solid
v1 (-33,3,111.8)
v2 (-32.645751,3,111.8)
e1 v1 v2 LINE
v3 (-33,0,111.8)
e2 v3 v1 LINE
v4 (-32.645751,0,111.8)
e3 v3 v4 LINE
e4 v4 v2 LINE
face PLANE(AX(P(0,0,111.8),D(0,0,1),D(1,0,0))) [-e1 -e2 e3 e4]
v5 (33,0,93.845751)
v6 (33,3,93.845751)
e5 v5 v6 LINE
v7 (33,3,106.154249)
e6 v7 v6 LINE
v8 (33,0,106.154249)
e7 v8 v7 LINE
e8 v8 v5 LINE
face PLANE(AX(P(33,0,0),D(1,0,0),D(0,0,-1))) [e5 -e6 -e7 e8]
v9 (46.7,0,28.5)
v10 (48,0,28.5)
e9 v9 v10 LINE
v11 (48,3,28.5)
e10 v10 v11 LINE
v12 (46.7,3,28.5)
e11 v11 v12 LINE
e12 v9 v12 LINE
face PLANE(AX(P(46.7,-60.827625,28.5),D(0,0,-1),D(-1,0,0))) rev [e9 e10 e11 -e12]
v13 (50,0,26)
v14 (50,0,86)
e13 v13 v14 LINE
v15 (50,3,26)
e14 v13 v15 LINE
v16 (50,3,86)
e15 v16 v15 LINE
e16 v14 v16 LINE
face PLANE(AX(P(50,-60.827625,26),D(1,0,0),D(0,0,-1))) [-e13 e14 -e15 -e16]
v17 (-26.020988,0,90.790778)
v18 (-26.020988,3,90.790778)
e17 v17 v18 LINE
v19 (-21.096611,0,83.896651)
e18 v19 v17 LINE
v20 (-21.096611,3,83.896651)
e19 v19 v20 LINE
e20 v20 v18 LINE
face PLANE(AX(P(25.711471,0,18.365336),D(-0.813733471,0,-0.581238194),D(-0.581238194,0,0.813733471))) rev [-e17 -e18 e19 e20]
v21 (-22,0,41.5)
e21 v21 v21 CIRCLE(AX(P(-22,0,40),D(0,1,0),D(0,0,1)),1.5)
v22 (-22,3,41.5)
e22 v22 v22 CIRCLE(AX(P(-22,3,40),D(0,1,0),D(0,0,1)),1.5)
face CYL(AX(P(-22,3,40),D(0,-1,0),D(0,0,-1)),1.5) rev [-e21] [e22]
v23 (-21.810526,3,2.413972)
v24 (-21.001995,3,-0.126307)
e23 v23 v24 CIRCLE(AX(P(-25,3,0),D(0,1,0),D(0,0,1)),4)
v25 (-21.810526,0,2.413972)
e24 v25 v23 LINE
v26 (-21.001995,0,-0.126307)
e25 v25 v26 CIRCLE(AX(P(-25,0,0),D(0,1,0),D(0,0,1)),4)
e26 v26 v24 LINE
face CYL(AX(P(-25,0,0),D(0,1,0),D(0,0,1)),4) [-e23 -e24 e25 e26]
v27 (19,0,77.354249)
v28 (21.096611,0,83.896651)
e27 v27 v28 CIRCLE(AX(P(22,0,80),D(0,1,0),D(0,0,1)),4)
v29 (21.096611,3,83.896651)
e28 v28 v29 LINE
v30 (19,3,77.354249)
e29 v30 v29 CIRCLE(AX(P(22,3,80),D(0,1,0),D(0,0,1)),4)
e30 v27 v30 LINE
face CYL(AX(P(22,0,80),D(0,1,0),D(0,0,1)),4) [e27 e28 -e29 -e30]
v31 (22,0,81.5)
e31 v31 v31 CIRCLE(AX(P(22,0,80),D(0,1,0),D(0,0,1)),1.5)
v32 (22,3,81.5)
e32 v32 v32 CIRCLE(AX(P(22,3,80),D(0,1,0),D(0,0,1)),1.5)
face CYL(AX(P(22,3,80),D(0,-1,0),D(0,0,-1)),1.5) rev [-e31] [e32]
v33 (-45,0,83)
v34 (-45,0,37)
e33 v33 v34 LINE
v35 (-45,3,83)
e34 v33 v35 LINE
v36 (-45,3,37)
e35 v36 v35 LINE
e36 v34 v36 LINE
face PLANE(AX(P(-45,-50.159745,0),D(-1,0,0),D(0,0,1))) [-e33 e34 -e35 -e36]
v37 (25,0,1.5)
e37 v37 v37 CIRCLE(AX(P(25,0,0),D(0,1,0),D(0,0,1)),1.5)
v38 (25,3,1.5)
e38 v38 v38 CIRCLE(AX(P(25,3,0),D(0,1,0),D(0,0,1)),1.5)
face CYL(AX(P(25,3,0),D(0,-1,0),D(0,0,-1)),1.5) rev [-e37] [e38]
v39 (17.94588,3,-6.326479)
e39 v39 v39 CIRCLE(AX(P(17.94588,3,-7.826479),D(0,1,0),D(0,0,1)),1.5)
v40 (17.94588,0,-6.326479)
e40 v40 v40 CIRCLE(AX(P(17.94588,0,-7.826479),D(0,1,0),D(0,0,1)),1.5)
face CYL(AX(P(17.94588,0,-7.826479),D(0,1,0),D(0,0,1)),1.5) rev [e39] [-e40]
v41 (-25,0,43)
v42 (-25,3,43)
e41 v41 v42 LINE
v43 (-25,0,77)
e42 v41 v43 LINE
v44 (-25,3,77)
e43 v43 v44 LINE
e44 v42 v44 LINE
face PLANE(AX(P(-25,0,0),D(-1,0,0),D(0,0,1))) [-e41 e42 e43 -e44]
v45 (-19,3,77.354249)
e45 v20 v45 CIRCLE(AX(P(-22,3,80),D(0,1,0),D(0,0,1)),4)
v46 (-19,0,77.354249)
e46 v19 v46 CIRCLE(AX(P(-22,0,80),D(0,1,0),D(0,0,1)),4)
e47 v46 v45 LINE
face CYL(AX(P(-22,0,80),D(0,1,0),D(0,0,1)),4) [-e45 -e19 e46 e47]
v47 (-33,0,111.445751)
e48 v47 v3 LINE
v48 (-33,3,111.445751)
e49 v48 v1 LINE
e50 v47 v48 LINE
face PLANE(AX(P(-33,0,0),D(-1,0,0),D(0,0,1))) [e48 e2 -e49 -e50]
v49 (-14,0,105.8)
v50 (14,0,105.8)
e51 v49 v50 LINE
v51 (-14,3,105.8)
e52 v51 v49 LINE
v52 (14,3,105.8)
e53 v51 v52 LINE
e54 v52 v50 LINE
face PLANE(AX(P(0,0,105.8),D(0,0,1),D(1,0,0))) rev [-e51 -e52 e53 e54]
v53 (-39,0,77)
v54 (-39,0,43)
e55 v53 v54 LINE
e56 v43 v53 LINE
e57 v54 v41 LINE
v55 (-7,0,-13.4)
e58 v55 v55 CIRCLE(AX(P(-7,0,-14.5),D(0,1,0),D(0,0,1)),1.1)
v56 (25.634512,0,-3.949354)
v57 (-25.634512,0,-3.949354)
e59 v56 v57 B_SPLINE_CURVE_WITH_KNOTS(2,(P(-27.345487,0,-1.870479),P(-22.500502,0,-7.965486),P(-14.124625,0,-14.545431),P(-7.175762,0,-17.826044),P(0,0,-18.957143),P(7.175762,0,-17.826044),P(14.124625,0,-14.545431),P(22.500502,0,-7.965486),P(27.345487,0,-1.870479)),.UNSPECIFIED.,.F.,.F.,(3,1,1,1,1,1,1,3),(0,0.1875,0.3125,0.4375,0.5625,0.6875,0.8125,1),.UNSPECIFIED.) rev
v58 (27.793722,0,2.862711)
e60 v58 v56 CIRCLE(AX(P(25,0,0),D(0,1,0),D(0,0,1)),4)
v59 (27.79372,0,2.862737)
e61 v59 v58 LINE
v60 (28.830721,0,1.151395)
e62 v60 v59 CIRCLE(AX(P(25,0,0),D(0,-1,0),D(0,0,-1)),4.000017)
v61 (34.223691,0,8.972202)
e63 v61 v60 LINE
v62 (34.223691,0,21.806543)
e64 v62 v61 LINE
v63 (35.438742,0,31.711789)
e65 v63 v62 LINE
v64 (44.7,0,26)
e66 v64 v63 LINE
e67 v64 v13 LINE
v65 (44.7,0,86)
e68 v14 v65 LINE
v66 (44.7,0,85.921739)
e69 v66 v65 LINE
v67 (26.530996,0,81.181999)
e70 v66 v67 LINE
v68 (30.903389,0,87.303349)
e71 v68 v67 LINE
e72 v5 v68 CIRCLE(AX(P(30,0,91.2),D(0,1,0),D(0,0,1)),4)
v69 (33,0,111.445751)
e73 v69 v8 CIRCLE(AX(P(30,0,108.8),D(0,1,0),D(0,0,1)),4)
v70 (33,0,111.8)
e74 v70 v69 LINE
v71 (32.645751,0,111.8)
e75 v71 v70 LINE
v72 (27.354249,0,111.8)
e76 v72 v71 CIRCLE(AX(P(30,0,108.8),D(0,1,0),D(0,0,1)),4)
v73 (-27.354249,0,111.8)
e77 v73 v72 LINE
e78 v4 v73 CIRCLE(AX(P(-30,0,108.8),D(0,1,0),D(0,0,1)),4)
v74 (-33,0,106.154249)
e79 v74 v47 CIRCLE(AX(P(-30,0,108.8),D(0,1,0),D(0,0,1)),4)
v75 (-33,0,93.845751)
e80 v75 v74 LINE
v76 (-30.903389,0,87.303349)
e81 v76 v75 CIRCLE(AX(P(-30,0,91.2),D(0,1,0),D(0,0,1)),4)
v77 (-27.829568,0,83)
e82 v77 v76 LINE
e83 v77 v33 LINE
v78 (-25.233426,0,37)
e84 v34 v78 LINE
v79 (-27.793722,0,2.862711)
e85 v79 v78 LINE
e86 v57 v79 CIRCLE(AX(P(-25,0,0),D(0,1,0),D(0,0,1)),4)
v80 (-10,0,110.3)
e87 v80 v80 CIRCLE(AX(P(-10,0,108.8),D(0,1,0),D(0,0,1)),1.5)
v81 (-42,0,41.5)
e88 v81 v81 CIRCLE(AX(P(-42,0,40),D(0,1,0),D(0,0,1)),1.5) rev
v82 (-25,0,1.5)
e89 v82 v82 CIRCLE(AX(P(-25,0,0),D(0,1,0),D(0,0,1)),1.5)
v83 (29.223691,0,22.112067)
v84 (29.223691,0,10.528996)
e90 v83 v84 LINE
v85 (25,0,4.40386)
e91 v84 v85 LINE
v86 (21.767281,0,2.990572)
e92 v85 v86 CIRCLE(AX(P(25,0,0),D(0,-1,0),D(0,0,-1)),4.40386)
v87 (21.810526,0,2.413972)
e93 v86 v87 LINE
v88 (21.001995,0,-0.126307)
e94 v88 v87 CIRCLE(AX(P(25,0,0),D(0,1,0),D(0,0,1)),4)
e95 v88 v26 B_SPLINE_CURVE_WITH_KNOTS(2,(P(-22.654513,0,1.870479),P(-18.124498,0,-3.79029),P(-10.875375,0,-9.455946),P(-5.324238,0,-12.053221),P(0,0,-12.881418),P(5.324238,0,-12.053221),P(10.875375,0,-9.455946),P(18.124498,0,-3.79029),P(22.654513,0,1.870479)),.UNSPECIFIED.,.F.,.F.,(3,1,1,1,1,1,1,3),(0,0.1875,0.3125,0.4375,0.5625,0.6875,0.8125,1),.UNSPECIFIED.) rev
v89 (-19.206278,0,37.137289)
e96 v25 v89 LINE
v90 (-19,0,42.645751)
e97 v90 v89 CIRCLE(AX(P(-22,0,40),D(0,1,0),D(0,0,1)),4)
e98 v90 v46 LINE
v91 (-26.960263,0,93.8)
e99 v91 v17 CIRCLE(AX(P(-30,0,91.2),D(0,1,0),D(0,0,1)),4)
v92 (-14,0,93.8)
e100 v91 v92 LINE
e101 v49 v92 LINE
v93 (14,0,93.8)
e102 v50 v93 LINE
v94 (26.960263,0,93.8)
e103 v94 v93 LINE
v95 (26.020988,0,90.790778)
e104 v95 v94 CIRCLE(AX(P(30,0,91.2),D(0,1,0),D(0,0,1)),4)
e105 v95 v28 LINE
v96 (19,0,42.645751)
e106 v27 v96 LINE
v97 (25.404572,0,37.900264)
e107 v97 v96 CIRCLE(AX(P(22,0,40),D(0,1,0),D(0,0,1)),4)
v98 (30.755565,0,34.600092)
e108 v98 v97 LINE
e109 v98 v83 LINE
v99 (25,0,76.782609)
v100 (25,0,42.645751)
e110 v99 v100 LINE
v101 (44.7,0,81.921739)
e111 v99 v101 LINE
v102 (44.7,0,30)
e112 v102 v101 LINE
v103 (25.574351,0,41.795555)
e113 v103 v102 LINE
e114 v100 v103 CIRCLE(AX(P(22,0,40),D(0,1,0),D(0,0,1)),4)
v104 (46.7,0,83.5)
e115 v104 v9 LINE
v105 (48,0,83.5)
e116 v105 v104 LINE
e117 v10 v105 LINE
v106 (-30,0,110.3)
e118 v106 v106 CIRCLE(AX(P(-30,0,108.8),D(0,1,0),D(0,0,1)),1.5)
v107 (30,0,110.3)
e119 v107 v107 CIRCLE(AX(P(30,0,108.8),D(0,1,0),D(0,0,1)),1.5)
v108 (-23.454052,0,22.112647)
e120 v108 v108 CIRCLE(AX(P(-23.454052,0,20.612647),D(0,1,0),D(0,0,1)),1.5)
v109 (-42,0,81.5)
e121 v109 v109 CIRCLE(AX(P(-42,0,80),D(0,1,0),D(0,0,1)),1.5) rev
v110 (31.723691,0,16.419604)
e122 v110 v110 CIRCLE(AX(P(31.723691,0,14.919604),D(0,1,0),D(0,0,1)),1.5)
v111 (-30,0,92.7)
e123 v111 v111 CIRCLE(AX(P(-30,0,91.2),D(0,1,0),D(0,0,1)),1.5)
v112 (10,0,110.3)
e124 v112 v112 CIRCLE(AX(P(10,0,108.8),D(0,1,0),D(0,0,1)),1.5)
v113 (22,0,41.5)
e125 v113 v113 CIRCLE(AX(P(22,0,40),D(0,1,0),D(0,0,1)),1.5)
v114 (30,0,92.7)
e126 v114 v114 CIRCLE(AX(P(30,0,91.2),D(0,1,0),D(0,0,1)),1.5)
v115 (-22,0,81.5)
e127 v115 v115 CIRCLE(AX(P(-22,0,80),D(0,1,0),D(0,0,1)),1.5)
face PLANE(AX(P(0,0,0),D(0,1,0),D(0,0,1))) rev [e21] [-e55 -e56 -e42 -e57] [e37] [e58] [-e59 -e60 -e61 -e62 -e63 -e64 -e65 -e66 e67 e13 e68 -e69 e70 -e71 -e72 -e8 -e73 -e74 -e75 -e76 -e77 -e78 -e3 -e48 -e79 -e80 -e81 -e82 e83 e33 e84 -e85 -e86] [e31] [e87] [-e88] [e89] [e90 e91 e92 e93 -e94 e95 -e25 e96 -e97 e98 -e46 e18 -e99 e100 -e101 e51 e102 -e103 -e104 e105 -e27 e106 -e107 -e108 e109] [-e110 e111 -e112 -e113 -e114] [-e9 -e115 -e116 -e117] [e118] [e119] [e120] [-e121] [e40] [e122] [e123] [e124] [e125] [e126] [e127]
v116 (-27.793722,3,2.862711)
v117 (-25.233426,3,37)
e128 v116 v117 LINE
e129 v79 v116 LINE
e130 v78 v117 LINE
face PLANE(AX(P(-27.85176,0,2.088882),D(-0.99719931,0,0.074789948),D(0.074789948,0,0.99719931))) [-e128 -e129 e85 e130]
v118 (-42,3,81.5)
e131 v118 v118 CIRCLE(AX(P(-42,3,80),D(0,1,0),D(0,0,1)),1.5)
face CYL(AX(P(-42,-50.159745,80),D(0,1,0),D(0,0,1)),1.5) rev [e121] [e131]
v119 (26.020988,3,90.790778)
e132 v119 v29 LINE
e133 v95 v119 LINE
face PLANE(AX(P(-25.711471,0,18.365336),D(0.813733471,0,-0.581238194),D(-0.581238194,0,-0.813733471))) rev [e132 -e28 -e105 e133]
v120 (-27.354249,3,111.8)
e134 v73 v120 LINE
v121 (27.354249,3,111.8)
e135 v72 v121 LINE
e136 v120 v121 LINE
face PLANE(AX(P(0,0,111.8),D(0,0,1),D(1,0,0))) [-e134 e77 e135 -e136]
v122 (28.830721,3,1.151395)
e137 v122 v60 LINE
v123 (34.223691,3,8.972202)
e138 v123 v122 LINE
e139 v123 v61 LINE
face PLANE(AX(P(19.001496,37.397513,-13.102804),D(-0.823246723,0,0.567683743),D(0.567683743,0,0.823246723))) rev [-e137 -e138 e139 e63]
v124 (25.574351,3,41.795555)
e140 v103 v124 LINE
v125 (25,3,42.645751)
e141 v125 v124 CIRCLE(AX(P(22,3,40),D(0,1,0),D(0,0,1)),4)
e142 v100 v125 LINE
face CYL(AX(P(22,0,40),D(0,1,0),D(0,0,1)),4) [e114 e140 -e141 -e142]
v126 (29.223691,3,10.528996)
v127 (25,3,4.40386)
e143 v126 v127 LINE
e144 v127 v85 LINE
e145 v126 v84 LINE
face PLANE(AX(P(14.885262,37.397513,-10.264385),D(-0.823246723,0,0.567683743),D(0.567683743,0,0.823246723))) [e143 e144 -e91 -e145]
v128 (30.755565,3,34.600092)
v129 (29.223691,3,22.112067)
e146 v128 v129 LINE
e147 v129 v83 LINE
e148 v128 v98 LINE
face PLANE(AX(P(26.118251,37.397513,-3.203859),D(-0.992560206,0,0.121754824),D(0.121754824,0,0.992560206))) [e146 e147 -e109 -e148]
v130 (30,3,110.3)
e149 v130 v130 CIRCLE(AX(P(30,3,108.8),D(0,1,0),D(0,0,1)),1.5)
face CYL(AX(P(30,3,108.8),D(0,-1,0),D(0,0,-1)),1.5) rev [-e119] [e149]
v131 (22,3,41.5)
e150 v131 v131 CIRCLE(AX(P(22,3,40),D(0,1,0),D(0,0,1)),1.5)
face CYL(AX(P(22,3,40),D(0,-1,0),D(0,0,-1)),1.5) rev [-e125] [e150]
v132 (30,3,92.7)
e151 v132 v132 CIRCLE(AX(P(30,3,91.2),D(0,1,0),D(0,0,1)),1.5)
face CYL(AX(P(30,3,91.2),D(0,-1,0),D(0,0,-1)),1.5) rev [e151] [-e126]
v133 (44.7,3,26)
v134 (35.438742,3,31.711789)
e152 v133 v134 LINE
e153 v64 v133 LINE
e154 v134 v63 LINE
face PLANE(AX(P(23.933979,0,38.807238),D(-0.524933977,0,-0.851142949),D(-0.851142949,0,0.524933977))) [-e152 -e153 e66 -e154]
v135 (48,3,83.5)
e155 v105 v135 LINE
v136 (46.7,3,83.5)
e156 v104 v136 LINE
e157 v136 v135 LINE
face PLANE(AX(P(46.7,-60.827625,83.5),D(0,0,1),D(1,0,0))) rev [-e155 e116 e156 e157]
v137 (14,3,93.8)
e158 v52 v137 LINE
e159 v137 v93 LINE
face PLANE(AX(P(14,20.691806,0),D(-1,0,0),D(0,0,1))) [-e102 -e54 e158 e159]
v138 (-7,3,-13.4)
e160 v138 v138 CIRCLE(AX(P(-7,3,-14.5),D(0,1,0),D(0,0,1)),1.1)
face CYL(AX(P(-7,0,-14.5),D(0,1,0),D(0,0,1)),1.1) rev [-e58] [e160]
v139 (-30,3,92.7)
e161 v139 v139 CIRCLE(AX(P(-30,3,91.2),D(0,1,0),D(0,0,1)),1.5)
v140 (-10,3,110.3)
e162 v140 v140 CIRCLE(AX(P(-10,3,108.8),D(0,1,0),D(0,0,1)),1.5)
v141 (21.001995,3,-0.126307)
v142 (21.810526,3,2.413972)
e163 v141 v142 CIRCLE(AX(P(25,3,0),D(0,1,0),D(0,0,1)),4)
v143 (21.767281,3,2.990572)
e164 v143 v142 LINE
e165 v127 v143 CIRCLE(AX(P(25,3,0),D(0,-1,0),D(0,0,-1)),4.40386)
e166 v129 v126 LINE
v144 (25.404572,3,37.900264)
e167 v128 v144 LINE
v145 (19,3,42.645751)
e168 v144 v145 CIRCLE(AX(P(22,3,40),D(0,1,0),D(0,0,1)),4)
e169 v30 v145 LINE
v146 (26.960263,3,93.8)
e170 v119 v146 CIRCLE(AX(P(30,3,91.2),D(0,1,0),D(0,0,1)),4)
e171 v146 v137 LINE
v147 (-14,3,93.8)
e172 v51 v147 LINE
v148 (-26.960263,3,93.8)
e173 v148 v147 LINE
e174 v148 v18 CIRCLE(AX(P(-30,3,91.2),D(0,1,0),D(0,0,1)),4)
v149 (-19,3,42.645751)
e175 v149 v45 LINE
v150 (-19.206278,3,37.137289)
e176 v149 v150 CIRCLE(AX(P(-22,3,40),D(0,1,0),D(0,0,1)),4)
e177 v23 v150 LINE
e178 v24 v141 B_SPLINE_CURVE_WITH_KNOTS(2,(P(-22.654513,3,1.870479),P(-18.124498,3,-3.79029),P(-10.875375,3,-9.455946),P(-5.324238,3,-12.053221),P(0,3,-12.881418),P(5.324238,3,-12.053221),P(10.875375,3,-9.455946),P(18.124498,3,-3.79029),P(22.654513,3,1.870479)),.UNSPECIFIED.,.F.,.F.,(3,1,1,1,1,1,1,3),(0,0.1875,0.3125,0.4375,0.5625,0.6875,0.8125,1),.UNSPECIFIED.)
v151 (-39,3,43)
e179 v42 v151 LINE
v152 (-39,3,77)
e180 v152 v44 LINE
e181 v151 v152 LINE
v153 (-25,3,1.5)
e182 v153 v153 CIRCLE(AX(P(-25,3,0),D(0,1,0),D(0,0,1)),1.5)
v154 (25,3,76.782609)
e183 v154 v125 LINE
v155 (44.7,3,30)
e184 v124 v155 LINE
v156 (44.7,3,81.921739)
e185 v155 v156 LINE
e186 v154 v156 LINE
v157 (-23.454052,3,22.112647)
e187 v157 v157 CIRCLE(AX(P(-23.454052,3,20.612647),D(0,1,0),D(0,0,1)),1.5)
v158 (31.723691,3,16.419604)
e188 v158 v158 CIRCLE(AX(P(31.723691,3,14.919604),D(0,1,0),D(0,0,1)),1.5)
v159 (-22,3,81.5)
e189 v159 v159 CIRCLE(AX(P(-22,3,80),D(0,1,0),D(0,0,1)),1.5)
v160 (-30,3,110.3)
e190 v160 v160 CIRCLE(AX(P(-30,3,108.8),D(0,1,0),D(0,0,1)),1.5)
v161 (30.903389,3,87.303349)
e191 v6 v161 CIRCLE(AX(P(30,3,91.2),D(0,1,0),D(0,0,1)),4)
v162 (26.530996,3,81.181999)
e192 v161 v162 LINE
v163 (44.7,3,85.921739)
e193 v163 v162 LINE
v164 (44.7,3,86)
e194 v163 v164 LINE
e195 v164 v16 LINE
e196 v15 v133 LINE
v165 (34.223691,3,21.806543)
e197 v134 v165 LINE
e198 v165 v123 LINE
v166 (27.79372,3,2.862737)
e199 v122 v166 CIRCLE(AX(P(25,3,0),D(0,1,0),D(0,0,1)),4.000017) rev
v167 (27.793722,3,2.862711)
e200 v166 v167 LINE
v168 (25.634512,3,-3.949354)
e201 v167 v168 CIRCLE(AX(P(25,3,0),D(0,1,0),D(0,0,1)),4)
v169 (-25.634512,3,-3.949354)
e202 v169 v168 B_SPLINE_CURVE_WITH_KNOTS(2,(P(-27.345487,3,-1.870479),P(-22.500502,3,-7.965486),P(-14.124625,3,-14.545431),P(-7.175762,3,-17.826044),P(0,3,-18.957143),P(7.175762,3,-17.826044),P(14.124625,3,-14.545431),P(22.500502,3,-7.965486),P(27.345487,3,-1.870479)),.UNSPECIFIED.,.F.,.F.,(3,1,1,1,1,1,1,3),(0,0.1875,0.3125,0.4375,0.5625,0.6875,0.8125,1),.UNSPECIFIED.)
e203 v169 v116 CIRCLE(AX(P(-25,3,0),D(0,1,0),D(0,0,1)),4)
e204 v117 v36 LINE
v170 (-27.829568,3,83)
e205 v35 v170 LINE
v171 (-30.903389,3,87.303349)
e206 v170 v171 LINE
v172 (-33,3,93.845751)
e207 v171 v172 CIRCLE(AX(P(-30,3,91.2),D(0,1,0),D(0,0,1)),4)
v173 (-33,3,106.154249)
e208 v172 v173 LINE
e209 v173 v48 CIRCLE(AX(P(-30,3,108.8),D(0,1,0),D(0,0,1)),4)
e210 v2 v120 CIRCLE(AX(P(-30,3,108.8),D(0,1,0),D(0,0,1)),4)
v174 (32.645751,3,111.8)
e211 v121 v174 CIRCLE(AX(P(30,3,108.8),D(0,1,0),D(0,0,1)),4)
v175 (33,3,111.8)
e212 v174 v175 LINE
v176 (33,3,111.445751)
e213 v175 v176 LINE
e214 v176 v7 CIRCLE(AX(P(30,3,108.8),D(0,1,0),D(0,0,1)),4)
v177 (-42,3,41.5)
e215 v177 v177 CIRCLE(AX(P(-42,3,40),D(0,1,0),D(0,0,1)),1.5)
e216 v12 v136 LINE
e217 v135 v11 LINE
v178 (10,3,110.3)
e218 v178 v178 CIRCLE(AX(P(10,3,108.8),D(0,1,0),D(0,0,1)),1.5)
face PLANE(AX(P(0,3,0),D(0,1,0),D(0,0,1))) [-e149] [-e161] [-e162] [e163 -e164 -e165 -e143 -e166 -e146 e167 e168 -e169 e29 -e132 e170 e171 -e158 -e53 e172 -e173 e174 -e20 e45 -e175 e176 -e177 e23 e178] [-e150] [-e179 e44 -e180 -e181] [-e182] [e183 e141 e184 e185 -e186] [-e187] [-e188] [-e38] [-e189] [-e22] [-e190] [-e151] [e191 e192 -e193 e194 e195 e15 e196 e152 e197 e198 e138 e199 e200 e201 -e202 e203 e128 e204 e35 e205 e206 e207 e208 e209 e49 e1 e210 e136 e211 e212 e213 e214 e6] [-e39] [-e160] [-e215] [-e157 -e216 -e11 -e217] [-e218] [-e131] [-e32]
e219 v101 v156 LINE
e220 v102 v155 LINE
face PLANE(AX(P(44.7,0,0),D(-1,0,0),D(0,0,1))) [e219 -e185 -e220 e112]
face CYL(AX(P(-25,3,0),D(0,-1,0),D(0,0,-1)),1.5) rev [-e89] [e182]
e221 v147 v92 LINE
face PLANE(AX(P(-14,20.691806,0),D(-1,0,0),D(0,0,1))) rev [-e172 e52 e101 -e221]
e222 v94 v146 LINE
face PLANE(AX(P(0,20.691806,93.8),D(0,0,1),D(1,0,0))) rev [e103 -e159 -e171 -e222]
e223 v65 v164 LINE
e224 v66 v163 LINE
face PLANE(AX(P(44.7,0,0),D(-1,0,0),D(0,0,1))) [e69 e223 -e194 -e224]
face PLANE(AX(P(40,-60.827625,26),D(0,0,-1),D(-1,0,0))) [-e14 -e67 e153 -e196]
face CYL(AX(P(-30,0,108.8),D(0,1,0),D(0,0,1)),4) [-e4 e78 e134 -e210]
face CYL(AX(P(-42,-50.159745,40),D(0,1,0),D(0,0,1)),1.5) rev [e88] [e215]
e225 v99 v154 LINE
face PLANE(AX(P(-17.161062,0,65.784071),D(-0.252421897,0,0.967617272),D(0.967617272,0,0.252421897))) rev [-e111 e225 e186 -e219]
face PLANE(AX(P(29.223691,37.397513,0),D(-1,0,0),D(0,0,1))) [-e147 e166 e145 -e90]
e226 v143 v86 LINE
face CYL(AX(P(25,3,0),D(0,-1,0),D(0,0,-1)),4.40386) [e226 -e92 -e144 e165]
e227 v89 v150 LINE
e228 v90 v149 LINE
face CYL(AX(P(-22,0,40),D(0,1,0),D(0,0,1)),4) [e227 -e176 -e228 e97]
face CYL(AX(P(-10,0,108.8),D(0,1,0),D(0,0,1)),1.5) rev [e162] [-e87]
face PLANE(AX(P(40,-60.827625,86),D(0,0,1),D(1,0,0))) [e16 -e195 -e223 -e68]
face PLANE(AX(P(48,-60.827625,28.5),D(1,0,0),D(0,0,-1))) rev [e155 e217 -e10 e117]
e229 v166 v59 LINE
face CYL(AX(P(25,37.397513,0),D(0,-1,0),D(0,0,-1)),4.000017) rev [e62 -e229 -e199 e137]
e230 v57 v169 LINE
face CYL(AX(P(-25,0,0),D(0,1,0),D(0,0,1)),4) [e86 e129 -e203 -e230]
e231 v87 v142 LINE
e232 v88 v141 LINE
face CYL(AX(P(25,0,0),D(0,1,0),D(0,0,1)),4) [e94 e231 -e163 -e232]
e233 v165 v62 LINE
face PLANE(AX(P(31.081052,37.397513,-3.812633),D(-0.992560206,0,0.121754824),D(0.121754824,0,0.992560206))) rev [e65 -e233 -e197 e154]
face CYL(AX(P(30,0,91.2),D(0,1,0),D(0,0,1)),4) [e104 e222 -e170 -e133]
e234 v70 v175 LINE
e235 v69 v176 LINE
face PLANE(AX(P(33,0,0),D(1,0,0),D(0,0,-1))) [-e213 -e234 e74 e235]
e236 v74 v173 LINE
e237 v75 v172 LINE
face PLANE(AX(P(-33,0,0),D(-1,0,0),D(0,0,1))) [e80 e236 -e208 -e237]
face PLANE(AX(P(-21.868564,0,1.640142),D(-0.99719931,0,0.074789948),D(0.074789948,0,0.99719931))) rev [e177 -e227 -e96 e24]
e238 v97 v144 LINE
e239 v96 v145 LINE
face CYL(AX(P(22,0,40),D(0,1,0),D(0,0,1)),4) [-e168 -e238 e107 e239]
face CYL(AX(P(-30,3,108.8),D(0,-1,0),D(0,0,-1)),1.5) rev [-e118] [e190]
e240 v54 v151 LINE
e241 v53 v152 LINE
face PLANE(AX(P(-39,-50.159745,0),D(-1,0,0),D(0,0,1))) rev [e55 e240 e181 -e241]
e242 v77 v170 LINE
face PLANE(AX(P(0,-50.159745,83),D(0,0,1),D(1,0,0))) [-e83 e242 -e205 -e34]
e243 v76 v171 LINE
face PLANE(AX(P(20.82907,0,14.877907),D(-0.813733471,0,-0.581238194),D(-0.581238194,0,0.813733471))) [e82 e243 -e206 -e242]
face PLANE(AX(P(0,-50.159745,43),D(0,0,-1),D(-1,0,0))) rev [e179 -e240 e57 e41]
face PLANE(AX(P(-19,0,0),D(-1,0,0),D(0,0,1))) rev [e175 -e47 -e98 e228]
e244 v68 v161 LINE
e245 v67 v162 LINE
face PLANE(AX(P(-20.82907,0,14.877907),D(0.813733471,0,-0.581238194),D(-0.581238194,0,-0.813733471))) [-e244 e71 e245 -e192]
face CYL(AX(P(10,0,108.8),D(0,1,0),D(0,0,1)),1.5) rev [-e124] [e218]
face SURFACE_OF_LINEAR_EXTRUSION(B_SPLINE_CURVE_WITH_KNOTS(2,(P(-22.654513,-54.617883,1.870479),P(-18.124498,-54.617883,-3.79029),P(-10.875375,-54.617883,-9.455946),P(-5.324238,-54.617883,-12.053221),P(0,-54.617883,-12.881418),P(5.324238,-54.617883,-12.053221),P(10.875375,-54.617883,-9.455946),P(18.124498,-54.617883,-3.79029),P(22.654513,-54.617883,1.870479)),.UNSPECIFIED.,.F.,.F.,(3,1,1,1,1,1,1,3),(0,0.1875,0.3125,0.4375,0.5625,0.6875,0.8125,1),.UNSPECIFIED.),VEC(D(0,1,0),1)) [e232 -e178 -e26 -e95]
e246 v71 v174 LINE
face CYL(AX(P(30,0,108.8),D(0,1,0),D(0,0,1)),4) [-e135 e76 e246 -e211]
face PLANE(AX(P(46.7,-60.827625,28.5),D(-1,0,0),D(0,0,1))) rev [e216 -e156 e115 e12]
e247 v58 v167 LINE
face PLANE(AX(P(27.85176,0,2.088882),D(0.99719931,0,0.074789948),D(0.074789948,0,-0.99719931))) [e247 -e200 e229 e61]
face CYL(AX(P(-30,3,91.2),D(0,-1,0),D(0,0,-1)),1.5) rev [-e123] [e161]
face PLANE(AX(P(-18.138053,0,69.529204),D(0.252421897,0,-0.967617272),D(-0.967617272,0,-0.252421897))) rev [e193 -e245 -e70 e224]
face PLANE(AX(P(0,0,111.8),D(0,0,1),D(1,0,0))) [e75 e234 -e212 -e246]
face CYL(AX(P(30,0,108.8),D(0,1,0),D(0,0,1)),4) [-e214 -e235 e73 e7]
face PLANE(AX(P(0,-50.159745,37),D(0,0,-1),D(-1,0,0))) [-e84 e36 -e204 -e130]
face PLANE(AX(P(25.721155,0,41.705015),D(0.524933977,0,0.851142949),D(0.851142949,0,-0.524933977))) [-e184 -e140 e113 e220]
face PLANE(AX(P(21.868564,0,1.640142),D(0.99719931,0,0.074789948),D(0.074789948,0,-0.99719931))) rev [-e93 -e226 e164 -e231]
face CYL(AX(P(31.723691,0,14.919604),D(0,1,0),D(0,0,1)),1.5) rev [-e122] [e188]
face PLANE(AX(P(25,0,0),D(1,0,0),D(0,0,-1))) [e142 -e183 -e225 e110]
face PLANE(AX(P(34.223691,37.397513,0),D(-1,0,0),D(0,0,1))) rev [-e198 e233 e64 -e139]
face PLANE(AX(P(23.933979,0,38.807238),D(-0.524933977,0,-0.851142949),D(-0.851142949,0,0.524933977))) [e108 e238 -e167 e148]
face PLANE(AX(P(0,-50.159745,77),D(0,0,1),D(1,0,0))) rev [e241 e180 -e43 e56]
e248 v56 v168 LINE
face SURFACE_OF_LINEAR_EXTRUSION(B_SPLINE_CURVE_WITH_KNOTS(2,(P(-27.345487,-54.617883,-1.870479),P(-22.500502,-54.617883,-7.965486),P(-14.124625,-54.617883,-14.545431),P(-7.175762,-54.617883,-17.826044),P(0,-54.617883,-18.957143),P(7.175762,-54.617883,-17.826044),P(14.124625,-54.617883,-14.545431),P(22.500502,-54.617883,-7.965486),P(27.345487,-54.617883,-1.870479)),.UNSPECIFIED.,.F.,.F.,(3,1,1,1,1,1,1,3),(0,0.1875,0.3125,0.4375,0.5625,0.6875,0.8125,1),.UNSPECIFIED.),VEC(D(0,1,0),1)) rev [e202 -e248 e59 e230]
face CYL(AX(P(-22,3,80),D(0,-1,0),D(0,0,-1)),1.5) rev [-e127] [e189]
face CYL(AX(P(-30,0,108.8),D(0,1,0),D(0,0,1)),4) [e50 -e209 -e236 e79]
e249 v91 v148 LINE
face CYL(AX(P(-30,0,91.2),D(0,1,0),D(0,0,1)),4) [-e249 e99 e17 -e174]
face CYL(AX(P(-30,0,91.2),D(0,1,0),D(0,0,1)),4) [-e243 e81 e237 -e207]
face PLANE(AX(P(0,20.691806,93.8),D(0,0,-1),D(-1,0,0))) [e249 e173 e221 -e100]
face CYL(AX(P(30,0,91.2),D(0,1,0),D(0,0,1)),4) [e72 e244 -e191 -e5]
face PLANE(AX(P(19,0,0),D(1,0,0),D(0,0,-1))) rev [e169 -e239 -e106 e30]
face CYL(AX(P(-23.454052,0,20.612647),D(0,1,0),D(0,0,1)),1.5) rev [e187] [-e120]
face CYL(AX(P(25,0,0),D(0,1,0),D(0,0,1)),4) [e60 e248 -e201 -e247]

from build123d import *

# Parameters (mm, degrees)
SKETCH_1_W           = 80
SKETCH_1_H           = 120
SKETCH_1_R           = 1.5
EXTRUDE_1_DEPTH      = 3
SKETCH_2_W           = 10
SKETCH_2_H           = 60
SKETCH_2_W_2         = 1.3
SKETCH_2_H_2         = 55
EXTRUDE_2_DEPTH      = 3
CUT_EXTRUDE_1_DEPTH  = 126.435242257
EXTRUDE_4_DEPTH      = 3
EXTRUDE_START        = -3
EXTRUDE_7_DEPTH      = 3
CUT_EXTRUDE_5_DEPTH  = 124.421392121
SKETCH_20_W          = 13
SKETCH_20_H          = 12
EXTRUDE_8_DEPTH      = 3
CUT_EXTRUDE_6_DEPTH  = 124.421392121
SKETCH_23_R          = 1.5
EXTRUDE_9_DEPTH      = 3
SKETCH_24_R          = 1.5
CUT_EXTRUDE_7_DEPTH  = 124.421392121
SKETCH_25_R          = 1.5
CUT_EXTRUDE_8_DEPTH  = 124.421392121
SKETCH_26_R          = 1.5
CUT_EXTRUDE_9_DEPTH  = 124.421392121
SKETCH_27_R          = 1.1
CUT_EXTRUDE_10_DEPTH = 124.421392121


# Read off the part's stored shape, not the designer's step: 凸台-拉伸7
with BuildPart() as part:
    # 草图1 → 凸台-拉伸1 (new body)
    with BuildSketch(Plane(origin=(0, 0, 0), x_dir=(1, 0, 0), z_dir=(0, 1, 0))):
        with Locations((0, -55)):
            Rectangle(SKETCH_1_W, SKETCH_1_H)
        with Locations(Location((-25, 0, 0), (0, 0, 270))):
            Circle(SKETCH_1_R, mode=Mode.SUBTRACT)
        with Locations(Location((25, 0, 0), (0, 0, 270))):
            Circle(SKETCH_1_R, mode=Mode.SUBTRACT)
        with Locations(Location((-30, -91.2, 0), (0, 0, 270))):
            Circle(SKETCH_1_R, mode=Mode.SUBTRACT)
        with Locations(Location((-30, -108.8, 0), (0, 0, 270))):
            Circle(SKETCH_1_R, mode=Mode.SUBTRACT)
        with Locations(Location((30, -108.8, 0), (0, 0, 270))):
            Circle(SKETCH_1_R, mode=Mode.SUBTRACT)
        with Locations(Location((30, -91.2, 0), (0, 0, 270))):
            Circle(SKETCH_1_R, mode=Mode.SUBTRACT)
        with Locations(Location((-22, -40, 0), (0, 0, 270))):
            Circle(SKETCH_1_R, mode=Mode.SUBTRACT)
        with Locations(Location((-22, -80, 0), (0, 0, 270))):
            Circle(SKETCH_1_R, mode=Mode.SUBTRACT)
        with Locations(Location((22, -40, 0), (0, 0, 270))):
            Circle(SKETCH_1_R, mode=Mode.SUBTRACT)
        with Locations(Location((22, -80, 0), (0, 0, 270))):
            Circle(SKETCH_1_R, mode=Mode.SUBTRACT)
    extrude(amount=EXTRUDE_1_DEPTH)

    # 草图2 → 凸台-拉伸2 (add)
    with BuildSketch(Plane(origin=(0, 3, 0), x_dir=(1, 0, 0), z_dir=(0, 1, 0))):
        with Locations((45, -56)):
            Rectangle(SKETCH_2_W, SKETCH_2_H)
        with Locations((47.35, -56)):
            Rectangle(SKETCH_2_W_2, SKETCH_2_H_2, mode=Mode.SUBTRACT)
    extrude(amount=-EXTRUDE_2_DEPTH)

    # 草图6 → 切除-拉伸1 (cut, through all)
    with BuildSketch(Plane(origin=(0, 3, 0), x_dir=(1, 0, 0), z_dir=(0, 1, 0))):
        with BuildLine():
            Line((-25.189473533, -37.586028463), (-27.793722326, -2.862711226))
            ThreePointArc((-27.793722326, -2.862711226), (-26.553240274, 3.686115117), (-21, 0))
            ThreePointArc((-21, 0), (-21.20804179, -1.27320577), (-21.810526467, -2.413971537))
            Line((-21.810526467, -2.413971537), (-19.206277674, -37.137288774))
            ThreePointArc((-19.206277674, -37.137288774), (-18.313884883, -38.446759726), (-18, -40))
            ThreePointArc((-18, -40), (-18.258342613, -41.414213562), (-19, -42.645751311))
            Line((-19, -42.645751311), (-19, -77.354248689))
            ThreePointArc((-19, -77.354248689), (-18.258342613, -78.585786438), (-18, -80))
            ThreePointArc((-18, -80), (-18.868422538, -82.488618613), (-21.096611299, -83.896650979))
            Line((-21.096611299, -83.896650979), (-26.020987873, -90.790778183))
            ThreePointArc((-26.020987873, -90.790778183), (-26.005250414, -90.995120165), (-26, -91.2))
            ThreePointArc((-26, -91.2), (-26.258342613, -92.614213562), (-27, -93.845751311))
            Line((-27, -93.845751311), (-27, -105.8))
            Line((-27, -105.8), (27, -105.8))
            Line((27, -105.8), (27, -93.845751311))
            ThreePointArc((27, -93.845751311), (26.190817966, -92.420709724), (26.020987873, -90.790778183))
            Line((26.020987873, -90.790778183), (21.096611299, -83.896650979))
            ThreePointArc((21.096611299, -83.896650979), (18.190817966, -81.220709724), (19, -77.354248689))
            Line((19, -77.354248689), (19, -42.645751311))
            ThreePointArc((19, -42.645751311), (18.002801671, -39.850315262), (19.206277674, -37.137288774))
            Line((19.206277674, -37.137288774), (21.810526467, -2.413971537))
            ThreePointArc((21.810526467, -2.413971537), (23.72679423, 3.79195821), (29, 0))
            ThreePointArc((29, 0), (28.686115117, -1.553240274), (27.793722326, -2.862711226))
            Line((27.793722326, -2.862711226), (25.189473533, -37.586028463))
            ThreePointArc((25.189473533, -37.586028463), (25.300764223, -37.740585133), (25.404571796, -37.900264091))
            Line((25.404571796, -37.900264091), (44.7, -26))
            Line((44.7, -26), (40, -26))
            Line((40, -26), (40, 5))
            Line((40, 5), (-40, 5))
            Line((-40, 5), (-40, -115))
            Line((-40, -115), (40, -115))
            Line((40, -115), (40, -86))
            Line((40, -86), (44.7, -86))
            Line((44.7, -86), (44.7, -85.92173913))
            Line((44.7, -85.92173913), (26.530995751, -81.181998892))
            Line((26.530995751, -81.181998892), (30.903388701, -87.303349021))
            ThreePointArc((30.903388701, -87.303349021), (33.131577462, -88.711381387), (34, -91.2))
            ThreePointArc((34, -91.2), (33.741657387, -92.614213562), (33, -93.845751311))
            Line((33, -93.845751311), (33, -106.154248689))
            ThreePointArc((33, -106.154248689), (33.741657387, -107.385786438), (34, -108.8))
            ThreePointArc((34, -108.8), (33.741657387, -110.214213562), (33, -111.445751311))
            Line((33, -111.445751311), (33, -111.8))
            Line((33, -111.8), (32.645751311, -111.8))
            ThreePointArc((32.645751311, -111.8), (30, -112.8), (27.354248689, -111.8))
            Line((27.354248689, -111.8), (-27.354248689, -111.8))
            ThreePointArc((-27.354248689, -111.8), (-30, -112.8), (-32.645751311, -111.8))
            Line((-32.645751311, -111.8), (-33, -111.8))
            Line((-33, -111.8), (-33, -111.445751311))
            ThreePointArc((-33, -111.445751311), (-34, -108.8), (-33, -106.154248689))
            Line((-33, -106.154248689), (-33, -93.845751311))
            ThreePointArc((-33, -93.845751311), (-33.809182034, -89.979290276), (-30.903388701, -87.303349021))
            Line((-30.903388701, -87.303349021), (-25.979012127, -80.409221817))
            ThreePointArc((-25.979012127, -80.409221817), (-25.809182034, -78.779290276), (-25, -77.354248689))
            Line((-25, -77.354248689), (-25, -42.645751311))
            ThreePointArc((-25, -42.645751311), (-25.997198329, -40.149684738), (-25.189473533, -37.586028463))
        make_face()
        with BuildLine():
            Line((25, -76.782608696), (44.7, -81.92173913))
            Line((44.7, -81.92173913), (44.7, -30))
            Line((44.7, -30), (25.574350827, -41.795554556))
            ThreePointArc((25.574350827, -41.795554556), (25.31454836, -42.239144741), (25, -42.645751311))
            Line((25, -42.645751311), (25, -76.782608696))
        make_face()
    extrude(amount=-CUT_EXTRUDE_1_DEPTH, mode=Mode.SUBTRACT)

    # 草图8 → 凸台-拉伸4 (add)
    with BuildSketch(Plane(origin=(0, 3, 0), x_dir=(1, 0, 0), z_dir=(0, 1, 0))):
        with BuildLine():
            ThreePointArc((21.001994681, 0.126307052), (22.453984731, 3.085094204), (25.63451173, 3.949353727))
            add(Edge.make_bspline(
                [(-25.63451173, 3.949353727), (-21.616035979, 8.660307293), (-14.12462472, 14.545430623), (-7.175762049, 17.826043655), (0, 18.957143354), (7.175762049, 17.826043655), (14.12462472, 14.545430623), (21.616035979, 8.660307293), (25.63451173, 3.949353727)],
                knots=[0.032998994, 0.032998994, 0.032998994, 0.1875, 0.3125, 0.4375, 0.5625, 0.6875, 0.8125, 0.967001006, 0.967001006, 0.967001006], degree=2))
            ThreePointArc((-25.63451173, 3.949353727), (-22.453984731, 3.085094204), (-21.001994681, 0.126307052))
            add(Edge.make_bspline(
                [(-21.001994681, 0.126307052), (-17.328264465, 4.412597994), (-10.87537528, 9.455946034), (-5.324237951, 12.053221163), (0, 12.881417518), (5.324237951, 12.053221163), (10.87537528, 9.455946034), (17.328264465, 4.412597994), (21.001994681, 0.126307052)],
                knots=[0.034324579, 0.034324579, 0.034324579, 0.1875, 0.3125, 0.4375, 0.5625, 0.6875, 0.8125, 0.965675421, 0.965675421, 0.965675421], degree=2))
        make_face()
    extrude(amount=-EXTRUDE_4_DEPTH)

    # 凸台-拉伸7 outline → 凸台-拉伸7 (add)
    with BuildSketch(Plane.XZ.offset(EXTRUDE_START)):
        with BuildLine():
            ThreePointArc((27.793720423, 2.862736604), (28.42096157, 2.072958417), (28.83072097, 1.151395464))
            Line((28.83072097, 1.151395464), (34.223691018, 8.972202338))
            Line((34.223691018, 8.972202338), (34.223691018, 21.806543087))
            Line((34.223691018, 21.806543087), (35.438742218, 31.711788941))
            Line((35.438742218, 31.711788941), (30.755565173, 34.600091964))
            Line((30.755565173, 34.600091964), (29.223691018, 22.112066665))
            Line((29.223691018, 22.112066665), (29.223691018, 10.528995876))
            Line((29.223691018, 10.528995876), (27.415425056, 7.906674828))
            Line((27.415425056, 7.906674828), (27.793720423, 2.862736604))
        make_face()
    extrude(amount=EXTRUDE_7_DEPTH)

    # 草图17 → 切除-拉伸5 (cut, through all)
    with BuildSketch(Plane.XZ):
        with BuildLine():
            Line((25, 4.403860476), (27.415425056, 7.906674828))
            Line((27.415425056, 7.906674828), (25.189473533, 37.586028463))
            ThreePointArc((25.189473533, 37.586028463), (22.299159793, 36.01120276), (19.206277674, 37.137288774))
            Line((19.206277674, 37.137288774), (21.767281468, 2.990571516))
            ThreePointArc((21.767281468, 2.990571516), (23.235924124, 4.035098933), (25, 4.403860476))
        make_face()
    extrude(amount=-CUT_EXTRUDE_5_DEPTH, mode=Mode.SUBTRACT)

    # 草图20 → 凸台-拉伸8 (add)
    with BuildSketch(Plane(origin=(0, 0, 0), x_dir=(-1, 0, 0), z_dir=(0, -1, 0))):
        with Locations((20.5, -99.8)):
            Rectangle(SKETCH_20_W, SKETCH_20_H)
        with Locations((-20.5, -99.8)):
            Rectangle(SKETCH_20_W, SKETCH_20_H)
    extrude(amount=-EXTRUDE_8_DEPTH)

    # 草图22 → 切除-拉伸6 (cut, through all)
    with BuildSketch(Plane(origin=(0, 3, 0), x_dir=(1, 0, 0), z_dir=(0, 1, 0))):
        with BuildLine():
            ThreePointArc((-6.4, 15.3), (-7, 15.5), (-7.6, 15.3))
            ThreePointArc((-7.6, 15.3), (-7.447213595, 13.605572809), (-6, 14.5))
            ThreePointArc((-6, 14.5), (-6.105572809, 14.947213595), (-6.4, 15.3))
        make_face()
    extrude(amount=-CUT_EXTRUDE_6_DEPTH, mode=Mode.SUBTRACT)

    # 草图23 → 凸台-拉伸9 (add)
    with BuildSketch(Plane(origin=(0, 3, 0), x_dir=(1, 0, 0), z_dir=(0, 1, 0))):
        with BuildLine():
            Line((-25.189473533, -37.586028463), (-25.233425668, -37))
            Line((-25.233425668, -37), (-45, -37))
            Line((-45, -37), (-45, -83))
            Line((-45, -83), (-27.829567972, -83))
            Line((-27.829567972, -83), (-25.979012127, -80.409221817))
            ThreePointArc((-25.979012127, -80.409221817), (-25.809182034, -78.779290276), (-25, -77.354248689))
            Line((-25, -77.354248689), (-25, -77))
            Line((-25, -77), (-39, -77))
            Line((-39, -77), (-39, -43))
            Line((-39, -43), (-25, -43))
            Line((-25, -43), (-25, -42.645751311))
            ThreePointArc((-25, -42.645751311), (-25.997198329, -40.149684738), (-25.189473533, -37.586028463))
        make_face()
        with Locations(Location((-42, -80, 0), (0, 0, 270))):
            Circle(SKETCH_23_R, mode=Mode.SUBTRACT)
        with Locations(Location((-42, -40, 0), (0, 0, 270))):
            Circle(SKETCH_23_R, mode=Mode.SUBTRACT)
    extrude(amount=-EXTRUDE_9_DEPTH)

    # 草图24 → 切除-拉伸7 (cut, through all)
    with BuildSketch(Plane(origin=(0, 3, 0), x_dir=(1, 0, 0), z_dir=(0, 1, 0))):
        with Locations(Location((31.723691018, -14.919604311, 0), (0, 0, 270))):
            Circle(SKETCH_24_R)
    extrude(amount=-CUT_EXTRUDE_7_DEPTH, mode=Mode.SUBTRACT)

    # 草图25 → 切除-拉伸8 (cut, through all)
    with BuildSketch(Plane(origin=(0, 3, 0), x_dir=(1, 0, 0), z_dir=(0, 1, 0))):
        with Locations(Location((-10, -108.8, 0), (0, 0, 270))):
            Circle(SKETCH_25_R)
        with Locations(Location((10, -108.8, 0), (0, 0, 270))):
            Circle(SKETCH_25_R)
    extrude(amount=-CUT_EXTRUDE_8_DEPTH, mode=Mode.SUBTRACT)

    # 草图26 → 切除-拉伸9 (cut, through all)
    with BuildSketch(Plane(origin=(0, 3, 0), x_dir=(1, 0, 0), z_dir=(0, 1, 0))):
        with Locations(Location((-23.454051506, -20.612646593, 0), (0, 0, 270))):
            Circle(SKETCH_26_R)
        with Locations(Location((17.945879734, 7.826478982, 0), (0, 0, 270))):
            Circle(SKETCH_26_R)
    extrude(amount=-CUT_EXTRUDE_9_DEPTH, mode=Mode.SUBTRACT)

    # 草图27 → 切除-拉伸10 (cut, through all)
    with BuildSketch(Plane(origin=(0, 3, 0), x_dir=(1, 0, 0), z_dir=(0, 1, 0))):
        with Locations(Location((-7, 14.5, 0), (0, 0, 270))):
            Circle(SKETCH_27_R)
    extrude(amount=-CUT_EXTRUDE_10_DEPTH, mode=Mode.SUBTRACT)


solid = part.part
